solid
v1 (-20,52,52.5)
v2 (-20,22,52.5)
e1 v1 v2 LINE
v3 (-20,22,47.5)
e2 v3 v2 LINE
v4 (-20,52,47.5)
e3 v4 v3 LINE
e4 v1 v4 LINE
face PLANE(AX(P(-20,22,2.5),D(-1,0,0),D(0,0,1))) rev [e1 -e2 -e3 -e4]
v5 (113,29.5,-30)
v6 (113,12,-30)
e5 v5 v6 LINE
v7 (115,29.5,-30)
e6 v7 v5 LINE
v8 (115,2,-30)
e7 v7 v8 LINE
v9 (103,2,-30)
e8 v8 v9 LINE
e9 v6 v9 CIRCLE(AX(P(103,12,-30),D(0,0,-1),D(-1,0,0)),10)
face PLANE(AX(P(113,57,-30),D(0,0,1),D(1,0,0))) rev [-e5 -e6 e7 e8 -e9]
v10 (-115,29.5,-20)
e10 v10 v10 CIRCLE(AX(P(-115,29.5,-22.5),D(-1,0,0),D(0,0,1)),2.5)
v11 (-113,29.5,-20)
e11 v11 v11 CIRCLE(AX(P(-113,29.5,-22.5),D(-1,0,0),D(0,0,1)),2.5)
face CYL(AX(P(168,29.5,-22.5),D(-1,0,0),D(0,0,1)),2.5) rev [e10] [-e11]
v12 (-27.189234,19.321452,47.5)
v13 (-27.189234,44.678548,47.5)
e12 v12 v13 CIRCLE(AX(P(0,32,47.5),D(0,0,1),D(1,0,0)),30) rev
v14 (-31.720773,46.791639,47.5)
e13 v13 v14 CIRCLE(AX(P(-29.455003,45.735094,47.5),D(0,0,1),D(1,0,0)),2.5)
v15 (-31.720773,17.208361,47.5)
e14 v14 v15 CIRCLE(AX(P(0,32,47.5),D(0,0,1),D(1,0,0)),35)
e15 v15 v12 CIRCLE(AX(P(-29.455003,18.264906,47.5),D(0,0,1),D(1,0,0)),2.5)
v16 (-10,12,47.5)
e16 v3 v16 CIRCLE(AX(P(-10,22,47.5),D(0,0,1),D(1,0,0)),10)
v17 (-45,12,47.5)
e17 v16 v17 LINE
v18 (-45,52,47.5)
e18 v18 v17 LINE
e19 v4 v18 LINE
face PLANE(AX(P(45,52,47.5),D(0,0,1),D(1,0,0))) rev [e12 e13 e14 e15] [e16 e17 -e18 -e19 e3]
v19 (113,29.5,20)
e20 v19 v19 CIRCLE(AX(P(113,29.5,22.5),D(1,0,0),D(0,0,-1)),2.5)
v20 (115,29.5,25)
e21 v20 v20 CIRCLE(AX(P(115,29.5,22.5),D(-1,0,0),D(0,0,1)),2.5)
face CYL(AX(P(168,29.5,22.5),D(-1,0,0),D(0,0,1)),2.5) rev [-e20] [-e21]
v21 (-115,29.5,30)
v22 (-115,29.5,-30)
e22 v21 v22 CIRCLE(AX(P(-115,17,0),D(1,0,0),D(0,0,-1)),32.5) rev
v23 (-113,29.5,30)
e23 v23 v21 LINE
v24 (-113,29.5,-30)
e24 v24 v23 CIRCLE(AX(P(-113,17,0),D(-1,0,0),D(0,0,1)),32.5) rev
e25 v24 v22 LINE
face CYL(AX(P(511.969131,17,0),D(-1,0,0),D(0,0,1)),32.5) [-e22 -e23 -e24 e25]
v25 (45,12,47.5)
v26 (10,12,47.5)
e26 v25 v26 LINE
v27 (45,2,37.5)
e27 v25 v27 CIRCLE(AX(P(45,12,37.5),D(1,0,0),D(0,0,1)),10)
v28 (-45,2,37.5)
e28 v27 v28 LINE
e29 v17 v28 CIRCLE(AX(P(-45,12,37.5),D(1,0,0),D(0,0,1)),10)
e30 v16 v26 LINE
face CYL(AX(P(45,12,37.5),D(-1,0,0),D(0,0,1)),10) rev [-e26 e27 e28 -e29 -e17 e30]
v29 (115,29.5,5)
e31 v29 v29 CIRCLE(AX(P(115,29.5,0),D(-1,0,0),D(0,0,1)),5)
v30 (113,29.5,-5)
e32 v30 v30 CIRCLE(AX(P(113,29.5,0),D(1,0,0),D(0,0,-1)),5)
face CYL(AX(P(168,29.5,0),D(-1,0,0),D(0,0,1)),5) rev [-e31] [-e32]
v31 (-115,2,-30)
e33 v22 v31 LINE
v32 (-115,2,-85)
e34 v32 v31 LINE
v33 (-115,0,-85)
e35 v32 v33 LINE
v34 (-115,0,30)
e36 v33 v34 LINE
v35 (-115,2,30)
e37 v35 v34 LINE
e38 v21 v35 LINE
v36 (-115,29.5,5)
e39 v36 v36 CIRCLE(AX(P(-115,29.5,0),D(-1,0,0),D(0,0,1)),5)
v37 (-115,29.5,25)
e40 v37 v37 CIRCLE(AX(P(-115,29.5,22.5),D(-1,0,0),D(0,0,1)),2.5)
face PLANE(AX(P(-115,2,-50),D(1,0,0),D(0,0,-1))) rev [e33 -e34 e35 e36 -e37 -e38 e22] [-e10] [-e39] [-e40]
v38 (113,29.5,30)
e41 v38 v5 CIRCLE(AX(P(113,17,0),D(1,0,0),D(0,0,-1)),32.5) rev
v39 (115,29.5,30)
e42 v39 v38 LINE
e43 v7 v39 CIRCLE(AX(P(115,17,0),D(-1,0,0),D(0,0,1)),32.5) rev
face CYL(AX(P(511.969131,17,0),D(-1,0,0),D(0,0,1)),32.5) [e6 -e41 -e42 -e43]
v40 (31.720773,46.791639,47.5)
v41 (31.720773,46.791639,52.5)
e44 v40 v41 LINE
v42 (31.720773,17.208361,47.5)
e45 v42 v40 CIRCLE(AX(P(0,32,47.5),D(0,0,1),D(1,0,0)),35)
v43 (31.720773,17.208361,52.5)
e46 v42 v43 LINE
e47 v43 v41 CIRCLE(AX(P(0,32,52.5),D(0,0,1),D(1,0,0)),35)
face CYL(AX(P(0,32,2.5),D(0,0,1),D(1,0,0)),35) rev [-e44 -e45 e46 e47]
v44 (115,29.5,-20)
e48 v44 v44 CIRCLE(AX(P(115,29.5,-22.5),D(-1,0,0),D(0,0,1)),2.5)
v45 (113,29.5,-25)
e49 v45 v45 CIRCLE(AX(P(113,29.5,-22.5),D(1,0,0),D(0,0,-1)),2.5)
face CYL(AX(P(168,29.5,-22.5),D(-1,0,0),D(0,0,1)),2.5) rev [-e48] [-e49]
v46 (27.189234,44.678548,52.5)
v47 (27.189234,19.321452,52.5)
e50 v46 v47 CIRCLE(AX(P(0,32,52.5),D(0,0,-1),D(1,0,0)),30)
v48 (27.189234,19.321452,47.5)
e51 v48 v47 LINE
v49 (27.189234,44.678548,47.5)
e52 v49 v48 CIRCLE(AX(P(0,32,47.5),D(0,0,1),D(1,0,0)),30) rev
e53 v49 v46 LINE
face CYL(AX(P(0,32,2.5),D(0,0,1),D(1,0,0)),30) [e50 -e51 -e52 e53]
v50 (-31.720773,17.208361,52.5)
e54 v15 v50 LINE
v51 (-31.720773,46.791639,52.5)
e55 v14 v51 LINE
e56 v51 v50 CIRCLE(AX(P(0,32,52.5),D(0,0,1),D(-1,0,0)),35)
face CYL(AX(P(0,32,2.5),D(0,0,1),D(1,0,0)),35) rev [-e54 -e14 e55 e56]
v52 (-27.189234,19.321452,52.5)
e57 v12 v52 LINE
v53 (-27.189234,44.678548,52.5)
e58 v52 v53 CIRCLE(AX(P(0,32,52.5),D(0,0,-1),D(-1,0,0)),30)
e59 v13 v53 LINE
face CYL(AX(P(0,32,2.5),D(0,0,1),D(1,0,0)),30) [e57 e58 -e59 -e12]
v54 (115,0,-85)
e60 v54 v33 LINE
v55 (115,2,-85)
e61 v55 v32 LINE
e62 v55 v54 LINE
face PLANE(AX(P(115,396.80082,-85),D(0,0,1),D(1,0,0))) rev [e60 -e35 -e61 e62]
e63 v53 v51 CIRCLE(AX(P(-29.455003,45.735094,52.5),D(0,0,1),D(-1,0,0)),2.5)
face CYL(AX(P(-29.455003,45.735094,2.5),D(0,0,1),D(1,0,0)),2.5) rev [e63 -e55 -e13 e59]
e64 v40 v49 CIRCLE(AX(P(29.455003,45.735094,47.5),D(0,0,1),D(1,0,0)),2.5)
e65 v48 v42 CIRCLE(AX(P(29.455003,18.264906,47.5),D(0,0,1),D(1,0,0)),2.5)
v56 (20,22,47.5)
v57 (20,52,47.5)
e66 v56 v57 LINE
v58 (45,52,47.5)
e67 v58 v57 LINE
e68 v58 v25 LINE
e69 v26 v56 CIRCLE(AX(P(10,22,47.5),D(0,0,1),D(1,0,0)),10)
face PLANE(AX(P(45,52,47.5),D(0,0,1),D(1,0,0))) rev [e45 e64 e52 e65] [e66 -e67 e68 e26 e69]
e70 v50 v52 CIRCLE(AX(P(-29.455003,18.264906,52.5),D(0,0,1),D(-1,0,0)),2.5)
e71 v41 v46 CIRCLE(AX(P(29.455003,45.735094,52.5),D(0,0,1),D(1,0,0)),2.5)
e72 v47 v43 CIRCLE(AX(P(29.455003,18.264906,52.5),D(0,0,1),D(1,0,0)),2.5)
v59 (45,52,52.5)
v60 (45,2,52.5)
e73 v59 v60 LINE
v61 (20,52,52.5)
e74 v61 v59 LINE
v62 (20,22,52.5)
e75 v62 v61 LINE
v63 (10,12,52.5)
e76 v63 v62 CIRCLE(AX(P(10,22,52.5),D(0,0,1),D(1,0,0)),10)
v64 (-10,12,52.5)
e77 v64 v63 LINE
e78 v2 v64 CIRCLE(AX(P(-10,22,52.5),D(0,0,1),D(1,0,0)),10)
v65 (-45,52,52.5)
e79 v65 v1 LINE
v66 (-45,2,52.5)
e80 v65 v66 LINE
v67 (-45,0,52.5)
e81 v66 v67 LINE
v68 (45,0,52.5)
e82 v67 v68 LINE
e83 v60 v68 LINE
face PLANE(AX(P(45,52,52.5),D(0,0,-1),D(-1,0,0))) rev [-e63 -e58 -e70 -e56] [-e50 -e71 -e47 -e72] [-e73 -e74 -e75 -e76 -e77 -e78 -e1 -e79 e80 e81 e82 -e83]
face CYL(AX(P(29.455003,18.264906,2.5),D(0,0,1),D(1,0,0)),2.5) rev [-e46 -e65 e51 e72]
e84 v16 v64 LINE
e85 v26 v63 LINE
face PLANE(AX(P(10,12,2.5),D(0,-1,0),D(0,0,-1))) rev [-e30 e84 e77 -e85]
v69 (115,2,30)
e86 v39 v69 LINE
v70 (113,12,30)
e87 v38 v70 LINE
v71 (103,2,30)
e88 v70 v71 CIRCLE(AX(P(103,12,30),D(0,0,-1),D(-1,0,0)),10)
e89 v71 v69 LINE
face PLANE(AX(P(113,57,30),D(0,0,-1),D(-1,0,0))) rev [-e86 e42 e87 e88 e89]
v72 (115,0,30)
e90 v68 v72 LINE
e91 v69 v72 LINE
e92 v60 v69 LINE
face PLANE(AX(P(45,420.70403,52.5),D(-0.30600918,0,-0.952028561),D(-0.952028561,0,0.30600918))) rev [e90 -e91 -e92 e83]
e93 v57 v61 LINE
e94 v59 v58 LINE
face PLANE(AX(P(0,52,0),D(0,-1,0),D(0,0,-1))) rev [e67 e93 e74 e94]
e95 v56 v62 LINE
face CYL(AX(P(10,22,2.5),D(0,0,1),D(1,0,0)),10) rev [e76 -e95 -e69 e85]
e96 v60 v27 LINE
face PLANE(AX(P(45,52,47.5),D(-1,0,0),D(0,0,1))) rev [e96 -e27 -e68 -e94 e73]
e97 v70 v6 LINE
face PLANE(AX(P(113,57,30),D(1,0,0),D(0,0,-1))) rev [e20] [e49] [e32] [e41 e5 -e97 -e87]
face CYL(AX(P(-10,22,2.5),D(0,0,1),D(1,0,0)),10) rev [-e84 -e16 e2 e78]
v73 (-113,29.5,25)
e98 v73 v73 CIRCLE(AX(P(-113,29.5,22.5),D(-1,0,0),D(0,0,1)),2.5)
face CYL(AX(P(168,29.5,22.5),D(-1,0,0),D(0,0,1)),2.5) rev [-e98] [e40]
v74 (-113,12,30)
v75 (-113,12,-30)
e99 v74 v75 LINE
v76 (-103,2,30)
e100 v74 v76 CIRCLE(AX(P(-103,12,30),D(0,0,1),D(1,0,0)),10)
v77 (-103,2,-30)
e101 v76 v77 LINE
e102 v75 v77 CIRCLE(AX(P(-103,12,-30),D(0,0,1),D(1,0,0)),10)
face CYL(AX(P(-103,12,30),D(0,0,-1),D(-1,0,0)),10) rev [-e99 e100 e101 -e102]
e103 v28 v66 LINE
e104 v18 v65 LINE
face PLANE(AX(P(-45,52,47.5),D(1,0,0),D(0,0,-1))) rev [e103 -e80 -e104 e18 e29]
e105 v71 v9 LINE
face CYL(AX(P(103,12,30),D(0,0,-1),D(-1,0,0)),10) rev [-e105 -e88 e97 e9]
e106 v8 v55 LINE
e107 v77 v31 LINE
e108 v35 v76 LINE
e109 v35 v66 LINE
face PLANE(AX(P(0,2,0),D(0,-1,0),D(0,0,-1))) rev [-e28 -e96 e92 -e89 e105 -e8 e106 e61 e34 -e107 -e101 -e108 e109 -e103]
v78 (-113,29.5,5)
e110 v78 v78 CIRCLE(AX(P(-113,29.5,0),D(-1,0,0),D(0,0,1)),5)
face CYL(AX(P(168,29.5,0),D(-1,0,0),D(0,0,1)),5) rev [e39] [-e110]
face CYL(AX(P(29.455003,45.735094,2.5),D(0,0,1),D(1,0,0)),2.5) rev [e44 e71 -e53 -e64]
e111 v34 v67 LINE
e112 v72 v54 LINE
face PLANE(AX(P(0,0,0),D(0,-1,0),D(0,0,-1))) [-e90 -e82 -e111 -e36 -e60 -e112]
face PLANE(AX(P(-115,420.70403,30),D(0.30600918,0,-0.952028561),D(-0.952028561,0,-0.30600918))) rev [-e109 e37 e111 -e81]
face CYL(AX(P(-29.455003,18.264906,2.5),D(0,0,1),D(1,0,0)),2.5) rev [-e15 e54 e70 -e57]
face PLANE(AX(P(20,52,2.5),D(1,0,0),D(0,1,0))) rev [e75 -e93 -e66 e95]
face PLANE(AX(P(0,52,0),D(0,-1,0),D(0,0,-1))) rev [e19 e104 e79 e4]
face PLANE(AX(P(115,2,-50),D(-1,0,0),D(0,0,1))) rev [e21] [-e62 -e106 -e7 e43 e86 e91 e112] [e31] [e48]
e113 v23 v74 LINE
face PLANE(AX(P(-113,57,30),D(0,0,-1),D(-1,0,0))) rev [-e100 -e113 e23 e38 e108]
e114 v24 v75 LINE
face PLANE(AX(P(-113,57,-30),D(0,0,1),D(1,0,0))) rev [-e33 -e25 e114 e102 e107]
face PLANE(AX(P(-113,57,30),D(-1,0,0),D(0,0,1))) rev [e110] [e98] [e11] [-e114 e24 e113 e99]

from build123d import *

# Parameters (mm, degrees)
BOSS_EXTRUDE1_DEPTH      = 2
SKETCH2_W                = 2
SKETCH2_H                = 60
BOSS_EXTRUDE2_DEPTH      = 55
SKETCH3_R                = 5
CUT_EXTRUDE1_DEPTH       = 283
SKETCH4_R                = 2.5
CUT_EXTRUDE2_DEPTH       = 283
SKETCH9_W                = 230
SKETCH9_H                = 50
BOSS_EXTRUDE3_DEPTH      = 2
SKETCH13_W               = 230
SKETCH13_H               = 10
BOSS_EXTRUDE6_DEPTH      = 20
CUT_EXTRUDE9_START       = -230
CUT_EXTRUDE9_DEPTH       = 230
CUT_EXTRUDE14_DEPTH      = 180.947909129
CUT_EXTRUDE14_DEPTH_BACK = 180.947909129
BOSS_EXTRUDE8_DEPTH      = 60
SKETCH38_W               = 90
SKETCH38_H               = 5
BOSS_EXTRUDE9_DEPTH      = 50
CUT_EXTRUDE15_DEPTH      = 50
CUT_EXTRUDE16_DEPTH      = 152.492574075
CUT_EXTRUDE16_DEPTH_BACK = 152.492574075
BOSS_EXTRUDE10_DEPTH     = 90


# Read off the part's stored shape, not the designer's step: Cut-Extrude9
with BuildPart() as part:
    # Sketch1 → Boss-Extrude1 (new body)
    with BuildSketch(Plane(origin=(0, 0, 0), x_dir=(1, 0, 0), z_dir=(0, 1, 0))):
        Polygon((115, 50), (115, 80), (-115, 80), (-115, 50), (-115, -50), (-115, -75), (115, -75), (115, -50), align=None)
    extrude(amount=BOSS_EXTRUDE1_DEPTH)

    # Sketch2 → Boss-Extrude2 (add)
    with BuildSketch(Plane(origin=(0, 2, 0), x_dir=(1, 0, 0), z_dir=(0, 1, 0))):
        with Locations((-114, 0)):
            Rectangle(SKETCH2_W, SKETCH2_H)
        with Locations((114, 0)):
            Rectangle(SKETCH2_W, SKETCH2_H)
    extrude(amount=BOSS_EXTRUDE2_DEPTH)

    # Sketch3 → Cut-Extrude1 (cut)
    with BuildSketch(Plane.ZY.offset(115)):
        with Locations((0, 29.5)):
            Circle(SKETCH3_R)
    extrude(amount=-CUT_EXTRUDE1_DEPTH, mode=Mode.SUBTRACT)

    # Sketch4 → Cut-Extrude2 (cut)
    with BuildSketch(Plane.ZY.offset(115)):
        with Locations((-22.5, 29.5)):
            Circle(SKETCH4_R)
        with Locations((22.5, 29.5)):
            Circle(SKETCH4_R)
    extrude(amount=-CUT_EXTRUDE2_DEPTH, mode=Mode.SUBTRACT)

    # Sketch9 → Boss-Extrude3 (add)
    with BuildSketch(Plane(origin=(0, 2, 0), x_dir=(1, 0, 0), z_dir=(0, 1, 0))):
        with Locations((0, 105)):
            Rectangle(SKETCH9_W, SKETCH9_H)
    extrude(amount=-BOSS_EXTRUDE3_DEPTH)

    # Sketch13 → Boss-Extrude6 (add)
    with BuildSketch(Plane.XZ):
        with Locations((0, -125)):
            Rectangle(SKETCH13_W, SKETCH13_H)
    extrude(amount=BOSS_EXTRUDE6_DEPTH)

    # Cut-Extrude9 outline → Cut-Extrude9 (cut)
    with BuildSketch(Plane(origin=(115, 0, 0), x_dir=(0, 0, -1), z_dir=(1, 0, 0)).offset(CUT_EXTRUDE9_START)):
        with BuildLine():
            Line((-30, 57), (-30, 29.5))
            ThreePointArc((-30, 29.5), (0, 49.5), (30, 29.5))
            Line((30, 29.5), (30, 57))
            Line((30, 57), (-30, 57))
        make_face()
    extrude(amount=CUT_EXTRUDE9_DEPTH, mode=Mode.SUBTRACT)

    # Sketch34 → Cut-Extrude14 (cut, two sides: drawn at the far end of the back side and taken through both)
    with BuildSketch(Plane(origin=(0, 2, 0), x_dir=(1, 0, 0), z_dir=(0, 1, 0)).offset(-CUT_EXTRUDE14_DEPTH_BACK)):
        Polygon((685.357029045, 85), (115, 85), (-115, 85), (-685.357029045, 85), (-685.357029045, 1225.71405809), (685.357029045, 1225.71405809), align=None)
    extrude(amount=CUT_EXTRUDE14_DEPTH + CUT_EXTRUDE14_DEPTH_BACK, mode=Mode.SUBTRACT)

    # Sketch37 → Boss-Extrude8 (add)
    with BuildSketch(Plane(origin=(0, 0, -30), x_dir=(-1, 0, 0), z_dir=(0, 0, -1))):
        with BuildLine():
            Line((-103, 2), (-113, 2))
            Line((-113, 2), (-113, 12))
            ThreePointArc((-113, 12), (-110.071067812, 4.928932188), (-103, 2))
        make_face()
        with BuildLine():
            Line((103, 2), (113, 2))
            Line((113, 2), (113, 12))
            ThreePointArc((113, 12), (110.071067812, 4.928932188), (103, 2))
        make_face()
    extrude(amount=-BOSS_EXTRUDE8_DEPTH)

    # Sketch38 → Boss-Extrude9 (add)
    with BuildSketch(Plane(origin=(0, 2, 0), x_dir=(1, 0, 0), z_dir=(0, 1, 0))):
        with Locations((0, -50)):
            Rectangle(SKETCH38_W, SKETCH38_H)
    extrude(amount=BOSS_EXTRUDE9_DEPTH)

    # Sketch39 → Cut-Extrude15 (cut)
    with BuildSketch(Plane.XY.offset(52.5)):
        with BuildLine():
            Line((0, 52), (-20, 52))
            Line((-20, 52), (-20, 22))
            ThreePointArc((-20, 22), (-17.071067812, 14.928932188), (-10, 12))
            Line((-10, 12), (10, 12))
            ThreePointArc((10, 12), (17.071067812, 14.928932188), (20, 22))
            Line((20, 22), (20, 52))
            Line((20, 52), (0, 52))
        make_face()
        with BuildLine():
            ThreePointArc((27.189233611, 19.321452148), (30, 32), (27.189233611, 44.678547852))
            ThreePointArc((27.189233611, 44.678547852), (28.398457424, 48.000862974), (31.720772546, 46.791639161))
            ThreePointArc((31.720772546, 46.791639161), (35, 32), (31.720772546, 17.208360839))
            ThreePointArc((31.720772546, 17.208360839), (28.398457424, 15.999137026), (27.189233611, 19.321452148))
        make_face()
        with BuildLine():
            ThreePointArc((-27.189233611, 19.321452148), (-28.398457424, 15.999137026), (-31.720772546, 17.208360839))
            ThreePointArc((-31.720772546, 17.208360839), (-35, 32), (-31.720772546, 46.791639161))
            ThreePointArc((-31.720772546, 46.791639161), (-28.398457424, 48.000862974), (-27.189233611, 44.678547852))
            ThreePointArc((-27.189233611, 44.678547852), (-30, 32), (-27.189233611, 19.321452148))
        make_face()
    extrude(amount=-CUT_EXTRUDE15_DEPTH, mode=Mode.SUBTRACT)

    # Sketch40 → Cut-Extrude16 (cut, two sides: drawn at the far end of the back side and taken through both)
    with BuildSketch(Plane(origin=(0, 2, 0), x_dir=(1, 0, 0), z_dir=(0, 1, 0)).offset(-CUT_EXTRUDE16_DEPTH_BACK)):
        Polygon((-614.144418911, 130.439277507), (-115, -30), (-45, -52.5), (45, -52.5), (115, -30), (614.144418911, 130.439277507), (614.144418911, -918.151992143), (-614.144418911, -918.151992143), align=None)
    extrude(amount=CUT_EXTRUDE16_DEPTH + CUT_EXTRUDE16_DEPTH_BACK, mode=Mode.SUBTRACT)

    # Sketch41 → Boss-Extrude10 (add)
    with BuildSketch(Plane.ZY.offset(45)):
        with BuildLine():
            Line((37.5, 2), (47.5, 2))
            Line((47.5, 2), (47.5, 12))
            ThreePointArc((47.5, 12), (44.571067812, 4.928932188), (37.5, 2))
        make_face()
    extrude(amount=-BOSS_EXTRUDE10_DEPTH)


solid = part.part
